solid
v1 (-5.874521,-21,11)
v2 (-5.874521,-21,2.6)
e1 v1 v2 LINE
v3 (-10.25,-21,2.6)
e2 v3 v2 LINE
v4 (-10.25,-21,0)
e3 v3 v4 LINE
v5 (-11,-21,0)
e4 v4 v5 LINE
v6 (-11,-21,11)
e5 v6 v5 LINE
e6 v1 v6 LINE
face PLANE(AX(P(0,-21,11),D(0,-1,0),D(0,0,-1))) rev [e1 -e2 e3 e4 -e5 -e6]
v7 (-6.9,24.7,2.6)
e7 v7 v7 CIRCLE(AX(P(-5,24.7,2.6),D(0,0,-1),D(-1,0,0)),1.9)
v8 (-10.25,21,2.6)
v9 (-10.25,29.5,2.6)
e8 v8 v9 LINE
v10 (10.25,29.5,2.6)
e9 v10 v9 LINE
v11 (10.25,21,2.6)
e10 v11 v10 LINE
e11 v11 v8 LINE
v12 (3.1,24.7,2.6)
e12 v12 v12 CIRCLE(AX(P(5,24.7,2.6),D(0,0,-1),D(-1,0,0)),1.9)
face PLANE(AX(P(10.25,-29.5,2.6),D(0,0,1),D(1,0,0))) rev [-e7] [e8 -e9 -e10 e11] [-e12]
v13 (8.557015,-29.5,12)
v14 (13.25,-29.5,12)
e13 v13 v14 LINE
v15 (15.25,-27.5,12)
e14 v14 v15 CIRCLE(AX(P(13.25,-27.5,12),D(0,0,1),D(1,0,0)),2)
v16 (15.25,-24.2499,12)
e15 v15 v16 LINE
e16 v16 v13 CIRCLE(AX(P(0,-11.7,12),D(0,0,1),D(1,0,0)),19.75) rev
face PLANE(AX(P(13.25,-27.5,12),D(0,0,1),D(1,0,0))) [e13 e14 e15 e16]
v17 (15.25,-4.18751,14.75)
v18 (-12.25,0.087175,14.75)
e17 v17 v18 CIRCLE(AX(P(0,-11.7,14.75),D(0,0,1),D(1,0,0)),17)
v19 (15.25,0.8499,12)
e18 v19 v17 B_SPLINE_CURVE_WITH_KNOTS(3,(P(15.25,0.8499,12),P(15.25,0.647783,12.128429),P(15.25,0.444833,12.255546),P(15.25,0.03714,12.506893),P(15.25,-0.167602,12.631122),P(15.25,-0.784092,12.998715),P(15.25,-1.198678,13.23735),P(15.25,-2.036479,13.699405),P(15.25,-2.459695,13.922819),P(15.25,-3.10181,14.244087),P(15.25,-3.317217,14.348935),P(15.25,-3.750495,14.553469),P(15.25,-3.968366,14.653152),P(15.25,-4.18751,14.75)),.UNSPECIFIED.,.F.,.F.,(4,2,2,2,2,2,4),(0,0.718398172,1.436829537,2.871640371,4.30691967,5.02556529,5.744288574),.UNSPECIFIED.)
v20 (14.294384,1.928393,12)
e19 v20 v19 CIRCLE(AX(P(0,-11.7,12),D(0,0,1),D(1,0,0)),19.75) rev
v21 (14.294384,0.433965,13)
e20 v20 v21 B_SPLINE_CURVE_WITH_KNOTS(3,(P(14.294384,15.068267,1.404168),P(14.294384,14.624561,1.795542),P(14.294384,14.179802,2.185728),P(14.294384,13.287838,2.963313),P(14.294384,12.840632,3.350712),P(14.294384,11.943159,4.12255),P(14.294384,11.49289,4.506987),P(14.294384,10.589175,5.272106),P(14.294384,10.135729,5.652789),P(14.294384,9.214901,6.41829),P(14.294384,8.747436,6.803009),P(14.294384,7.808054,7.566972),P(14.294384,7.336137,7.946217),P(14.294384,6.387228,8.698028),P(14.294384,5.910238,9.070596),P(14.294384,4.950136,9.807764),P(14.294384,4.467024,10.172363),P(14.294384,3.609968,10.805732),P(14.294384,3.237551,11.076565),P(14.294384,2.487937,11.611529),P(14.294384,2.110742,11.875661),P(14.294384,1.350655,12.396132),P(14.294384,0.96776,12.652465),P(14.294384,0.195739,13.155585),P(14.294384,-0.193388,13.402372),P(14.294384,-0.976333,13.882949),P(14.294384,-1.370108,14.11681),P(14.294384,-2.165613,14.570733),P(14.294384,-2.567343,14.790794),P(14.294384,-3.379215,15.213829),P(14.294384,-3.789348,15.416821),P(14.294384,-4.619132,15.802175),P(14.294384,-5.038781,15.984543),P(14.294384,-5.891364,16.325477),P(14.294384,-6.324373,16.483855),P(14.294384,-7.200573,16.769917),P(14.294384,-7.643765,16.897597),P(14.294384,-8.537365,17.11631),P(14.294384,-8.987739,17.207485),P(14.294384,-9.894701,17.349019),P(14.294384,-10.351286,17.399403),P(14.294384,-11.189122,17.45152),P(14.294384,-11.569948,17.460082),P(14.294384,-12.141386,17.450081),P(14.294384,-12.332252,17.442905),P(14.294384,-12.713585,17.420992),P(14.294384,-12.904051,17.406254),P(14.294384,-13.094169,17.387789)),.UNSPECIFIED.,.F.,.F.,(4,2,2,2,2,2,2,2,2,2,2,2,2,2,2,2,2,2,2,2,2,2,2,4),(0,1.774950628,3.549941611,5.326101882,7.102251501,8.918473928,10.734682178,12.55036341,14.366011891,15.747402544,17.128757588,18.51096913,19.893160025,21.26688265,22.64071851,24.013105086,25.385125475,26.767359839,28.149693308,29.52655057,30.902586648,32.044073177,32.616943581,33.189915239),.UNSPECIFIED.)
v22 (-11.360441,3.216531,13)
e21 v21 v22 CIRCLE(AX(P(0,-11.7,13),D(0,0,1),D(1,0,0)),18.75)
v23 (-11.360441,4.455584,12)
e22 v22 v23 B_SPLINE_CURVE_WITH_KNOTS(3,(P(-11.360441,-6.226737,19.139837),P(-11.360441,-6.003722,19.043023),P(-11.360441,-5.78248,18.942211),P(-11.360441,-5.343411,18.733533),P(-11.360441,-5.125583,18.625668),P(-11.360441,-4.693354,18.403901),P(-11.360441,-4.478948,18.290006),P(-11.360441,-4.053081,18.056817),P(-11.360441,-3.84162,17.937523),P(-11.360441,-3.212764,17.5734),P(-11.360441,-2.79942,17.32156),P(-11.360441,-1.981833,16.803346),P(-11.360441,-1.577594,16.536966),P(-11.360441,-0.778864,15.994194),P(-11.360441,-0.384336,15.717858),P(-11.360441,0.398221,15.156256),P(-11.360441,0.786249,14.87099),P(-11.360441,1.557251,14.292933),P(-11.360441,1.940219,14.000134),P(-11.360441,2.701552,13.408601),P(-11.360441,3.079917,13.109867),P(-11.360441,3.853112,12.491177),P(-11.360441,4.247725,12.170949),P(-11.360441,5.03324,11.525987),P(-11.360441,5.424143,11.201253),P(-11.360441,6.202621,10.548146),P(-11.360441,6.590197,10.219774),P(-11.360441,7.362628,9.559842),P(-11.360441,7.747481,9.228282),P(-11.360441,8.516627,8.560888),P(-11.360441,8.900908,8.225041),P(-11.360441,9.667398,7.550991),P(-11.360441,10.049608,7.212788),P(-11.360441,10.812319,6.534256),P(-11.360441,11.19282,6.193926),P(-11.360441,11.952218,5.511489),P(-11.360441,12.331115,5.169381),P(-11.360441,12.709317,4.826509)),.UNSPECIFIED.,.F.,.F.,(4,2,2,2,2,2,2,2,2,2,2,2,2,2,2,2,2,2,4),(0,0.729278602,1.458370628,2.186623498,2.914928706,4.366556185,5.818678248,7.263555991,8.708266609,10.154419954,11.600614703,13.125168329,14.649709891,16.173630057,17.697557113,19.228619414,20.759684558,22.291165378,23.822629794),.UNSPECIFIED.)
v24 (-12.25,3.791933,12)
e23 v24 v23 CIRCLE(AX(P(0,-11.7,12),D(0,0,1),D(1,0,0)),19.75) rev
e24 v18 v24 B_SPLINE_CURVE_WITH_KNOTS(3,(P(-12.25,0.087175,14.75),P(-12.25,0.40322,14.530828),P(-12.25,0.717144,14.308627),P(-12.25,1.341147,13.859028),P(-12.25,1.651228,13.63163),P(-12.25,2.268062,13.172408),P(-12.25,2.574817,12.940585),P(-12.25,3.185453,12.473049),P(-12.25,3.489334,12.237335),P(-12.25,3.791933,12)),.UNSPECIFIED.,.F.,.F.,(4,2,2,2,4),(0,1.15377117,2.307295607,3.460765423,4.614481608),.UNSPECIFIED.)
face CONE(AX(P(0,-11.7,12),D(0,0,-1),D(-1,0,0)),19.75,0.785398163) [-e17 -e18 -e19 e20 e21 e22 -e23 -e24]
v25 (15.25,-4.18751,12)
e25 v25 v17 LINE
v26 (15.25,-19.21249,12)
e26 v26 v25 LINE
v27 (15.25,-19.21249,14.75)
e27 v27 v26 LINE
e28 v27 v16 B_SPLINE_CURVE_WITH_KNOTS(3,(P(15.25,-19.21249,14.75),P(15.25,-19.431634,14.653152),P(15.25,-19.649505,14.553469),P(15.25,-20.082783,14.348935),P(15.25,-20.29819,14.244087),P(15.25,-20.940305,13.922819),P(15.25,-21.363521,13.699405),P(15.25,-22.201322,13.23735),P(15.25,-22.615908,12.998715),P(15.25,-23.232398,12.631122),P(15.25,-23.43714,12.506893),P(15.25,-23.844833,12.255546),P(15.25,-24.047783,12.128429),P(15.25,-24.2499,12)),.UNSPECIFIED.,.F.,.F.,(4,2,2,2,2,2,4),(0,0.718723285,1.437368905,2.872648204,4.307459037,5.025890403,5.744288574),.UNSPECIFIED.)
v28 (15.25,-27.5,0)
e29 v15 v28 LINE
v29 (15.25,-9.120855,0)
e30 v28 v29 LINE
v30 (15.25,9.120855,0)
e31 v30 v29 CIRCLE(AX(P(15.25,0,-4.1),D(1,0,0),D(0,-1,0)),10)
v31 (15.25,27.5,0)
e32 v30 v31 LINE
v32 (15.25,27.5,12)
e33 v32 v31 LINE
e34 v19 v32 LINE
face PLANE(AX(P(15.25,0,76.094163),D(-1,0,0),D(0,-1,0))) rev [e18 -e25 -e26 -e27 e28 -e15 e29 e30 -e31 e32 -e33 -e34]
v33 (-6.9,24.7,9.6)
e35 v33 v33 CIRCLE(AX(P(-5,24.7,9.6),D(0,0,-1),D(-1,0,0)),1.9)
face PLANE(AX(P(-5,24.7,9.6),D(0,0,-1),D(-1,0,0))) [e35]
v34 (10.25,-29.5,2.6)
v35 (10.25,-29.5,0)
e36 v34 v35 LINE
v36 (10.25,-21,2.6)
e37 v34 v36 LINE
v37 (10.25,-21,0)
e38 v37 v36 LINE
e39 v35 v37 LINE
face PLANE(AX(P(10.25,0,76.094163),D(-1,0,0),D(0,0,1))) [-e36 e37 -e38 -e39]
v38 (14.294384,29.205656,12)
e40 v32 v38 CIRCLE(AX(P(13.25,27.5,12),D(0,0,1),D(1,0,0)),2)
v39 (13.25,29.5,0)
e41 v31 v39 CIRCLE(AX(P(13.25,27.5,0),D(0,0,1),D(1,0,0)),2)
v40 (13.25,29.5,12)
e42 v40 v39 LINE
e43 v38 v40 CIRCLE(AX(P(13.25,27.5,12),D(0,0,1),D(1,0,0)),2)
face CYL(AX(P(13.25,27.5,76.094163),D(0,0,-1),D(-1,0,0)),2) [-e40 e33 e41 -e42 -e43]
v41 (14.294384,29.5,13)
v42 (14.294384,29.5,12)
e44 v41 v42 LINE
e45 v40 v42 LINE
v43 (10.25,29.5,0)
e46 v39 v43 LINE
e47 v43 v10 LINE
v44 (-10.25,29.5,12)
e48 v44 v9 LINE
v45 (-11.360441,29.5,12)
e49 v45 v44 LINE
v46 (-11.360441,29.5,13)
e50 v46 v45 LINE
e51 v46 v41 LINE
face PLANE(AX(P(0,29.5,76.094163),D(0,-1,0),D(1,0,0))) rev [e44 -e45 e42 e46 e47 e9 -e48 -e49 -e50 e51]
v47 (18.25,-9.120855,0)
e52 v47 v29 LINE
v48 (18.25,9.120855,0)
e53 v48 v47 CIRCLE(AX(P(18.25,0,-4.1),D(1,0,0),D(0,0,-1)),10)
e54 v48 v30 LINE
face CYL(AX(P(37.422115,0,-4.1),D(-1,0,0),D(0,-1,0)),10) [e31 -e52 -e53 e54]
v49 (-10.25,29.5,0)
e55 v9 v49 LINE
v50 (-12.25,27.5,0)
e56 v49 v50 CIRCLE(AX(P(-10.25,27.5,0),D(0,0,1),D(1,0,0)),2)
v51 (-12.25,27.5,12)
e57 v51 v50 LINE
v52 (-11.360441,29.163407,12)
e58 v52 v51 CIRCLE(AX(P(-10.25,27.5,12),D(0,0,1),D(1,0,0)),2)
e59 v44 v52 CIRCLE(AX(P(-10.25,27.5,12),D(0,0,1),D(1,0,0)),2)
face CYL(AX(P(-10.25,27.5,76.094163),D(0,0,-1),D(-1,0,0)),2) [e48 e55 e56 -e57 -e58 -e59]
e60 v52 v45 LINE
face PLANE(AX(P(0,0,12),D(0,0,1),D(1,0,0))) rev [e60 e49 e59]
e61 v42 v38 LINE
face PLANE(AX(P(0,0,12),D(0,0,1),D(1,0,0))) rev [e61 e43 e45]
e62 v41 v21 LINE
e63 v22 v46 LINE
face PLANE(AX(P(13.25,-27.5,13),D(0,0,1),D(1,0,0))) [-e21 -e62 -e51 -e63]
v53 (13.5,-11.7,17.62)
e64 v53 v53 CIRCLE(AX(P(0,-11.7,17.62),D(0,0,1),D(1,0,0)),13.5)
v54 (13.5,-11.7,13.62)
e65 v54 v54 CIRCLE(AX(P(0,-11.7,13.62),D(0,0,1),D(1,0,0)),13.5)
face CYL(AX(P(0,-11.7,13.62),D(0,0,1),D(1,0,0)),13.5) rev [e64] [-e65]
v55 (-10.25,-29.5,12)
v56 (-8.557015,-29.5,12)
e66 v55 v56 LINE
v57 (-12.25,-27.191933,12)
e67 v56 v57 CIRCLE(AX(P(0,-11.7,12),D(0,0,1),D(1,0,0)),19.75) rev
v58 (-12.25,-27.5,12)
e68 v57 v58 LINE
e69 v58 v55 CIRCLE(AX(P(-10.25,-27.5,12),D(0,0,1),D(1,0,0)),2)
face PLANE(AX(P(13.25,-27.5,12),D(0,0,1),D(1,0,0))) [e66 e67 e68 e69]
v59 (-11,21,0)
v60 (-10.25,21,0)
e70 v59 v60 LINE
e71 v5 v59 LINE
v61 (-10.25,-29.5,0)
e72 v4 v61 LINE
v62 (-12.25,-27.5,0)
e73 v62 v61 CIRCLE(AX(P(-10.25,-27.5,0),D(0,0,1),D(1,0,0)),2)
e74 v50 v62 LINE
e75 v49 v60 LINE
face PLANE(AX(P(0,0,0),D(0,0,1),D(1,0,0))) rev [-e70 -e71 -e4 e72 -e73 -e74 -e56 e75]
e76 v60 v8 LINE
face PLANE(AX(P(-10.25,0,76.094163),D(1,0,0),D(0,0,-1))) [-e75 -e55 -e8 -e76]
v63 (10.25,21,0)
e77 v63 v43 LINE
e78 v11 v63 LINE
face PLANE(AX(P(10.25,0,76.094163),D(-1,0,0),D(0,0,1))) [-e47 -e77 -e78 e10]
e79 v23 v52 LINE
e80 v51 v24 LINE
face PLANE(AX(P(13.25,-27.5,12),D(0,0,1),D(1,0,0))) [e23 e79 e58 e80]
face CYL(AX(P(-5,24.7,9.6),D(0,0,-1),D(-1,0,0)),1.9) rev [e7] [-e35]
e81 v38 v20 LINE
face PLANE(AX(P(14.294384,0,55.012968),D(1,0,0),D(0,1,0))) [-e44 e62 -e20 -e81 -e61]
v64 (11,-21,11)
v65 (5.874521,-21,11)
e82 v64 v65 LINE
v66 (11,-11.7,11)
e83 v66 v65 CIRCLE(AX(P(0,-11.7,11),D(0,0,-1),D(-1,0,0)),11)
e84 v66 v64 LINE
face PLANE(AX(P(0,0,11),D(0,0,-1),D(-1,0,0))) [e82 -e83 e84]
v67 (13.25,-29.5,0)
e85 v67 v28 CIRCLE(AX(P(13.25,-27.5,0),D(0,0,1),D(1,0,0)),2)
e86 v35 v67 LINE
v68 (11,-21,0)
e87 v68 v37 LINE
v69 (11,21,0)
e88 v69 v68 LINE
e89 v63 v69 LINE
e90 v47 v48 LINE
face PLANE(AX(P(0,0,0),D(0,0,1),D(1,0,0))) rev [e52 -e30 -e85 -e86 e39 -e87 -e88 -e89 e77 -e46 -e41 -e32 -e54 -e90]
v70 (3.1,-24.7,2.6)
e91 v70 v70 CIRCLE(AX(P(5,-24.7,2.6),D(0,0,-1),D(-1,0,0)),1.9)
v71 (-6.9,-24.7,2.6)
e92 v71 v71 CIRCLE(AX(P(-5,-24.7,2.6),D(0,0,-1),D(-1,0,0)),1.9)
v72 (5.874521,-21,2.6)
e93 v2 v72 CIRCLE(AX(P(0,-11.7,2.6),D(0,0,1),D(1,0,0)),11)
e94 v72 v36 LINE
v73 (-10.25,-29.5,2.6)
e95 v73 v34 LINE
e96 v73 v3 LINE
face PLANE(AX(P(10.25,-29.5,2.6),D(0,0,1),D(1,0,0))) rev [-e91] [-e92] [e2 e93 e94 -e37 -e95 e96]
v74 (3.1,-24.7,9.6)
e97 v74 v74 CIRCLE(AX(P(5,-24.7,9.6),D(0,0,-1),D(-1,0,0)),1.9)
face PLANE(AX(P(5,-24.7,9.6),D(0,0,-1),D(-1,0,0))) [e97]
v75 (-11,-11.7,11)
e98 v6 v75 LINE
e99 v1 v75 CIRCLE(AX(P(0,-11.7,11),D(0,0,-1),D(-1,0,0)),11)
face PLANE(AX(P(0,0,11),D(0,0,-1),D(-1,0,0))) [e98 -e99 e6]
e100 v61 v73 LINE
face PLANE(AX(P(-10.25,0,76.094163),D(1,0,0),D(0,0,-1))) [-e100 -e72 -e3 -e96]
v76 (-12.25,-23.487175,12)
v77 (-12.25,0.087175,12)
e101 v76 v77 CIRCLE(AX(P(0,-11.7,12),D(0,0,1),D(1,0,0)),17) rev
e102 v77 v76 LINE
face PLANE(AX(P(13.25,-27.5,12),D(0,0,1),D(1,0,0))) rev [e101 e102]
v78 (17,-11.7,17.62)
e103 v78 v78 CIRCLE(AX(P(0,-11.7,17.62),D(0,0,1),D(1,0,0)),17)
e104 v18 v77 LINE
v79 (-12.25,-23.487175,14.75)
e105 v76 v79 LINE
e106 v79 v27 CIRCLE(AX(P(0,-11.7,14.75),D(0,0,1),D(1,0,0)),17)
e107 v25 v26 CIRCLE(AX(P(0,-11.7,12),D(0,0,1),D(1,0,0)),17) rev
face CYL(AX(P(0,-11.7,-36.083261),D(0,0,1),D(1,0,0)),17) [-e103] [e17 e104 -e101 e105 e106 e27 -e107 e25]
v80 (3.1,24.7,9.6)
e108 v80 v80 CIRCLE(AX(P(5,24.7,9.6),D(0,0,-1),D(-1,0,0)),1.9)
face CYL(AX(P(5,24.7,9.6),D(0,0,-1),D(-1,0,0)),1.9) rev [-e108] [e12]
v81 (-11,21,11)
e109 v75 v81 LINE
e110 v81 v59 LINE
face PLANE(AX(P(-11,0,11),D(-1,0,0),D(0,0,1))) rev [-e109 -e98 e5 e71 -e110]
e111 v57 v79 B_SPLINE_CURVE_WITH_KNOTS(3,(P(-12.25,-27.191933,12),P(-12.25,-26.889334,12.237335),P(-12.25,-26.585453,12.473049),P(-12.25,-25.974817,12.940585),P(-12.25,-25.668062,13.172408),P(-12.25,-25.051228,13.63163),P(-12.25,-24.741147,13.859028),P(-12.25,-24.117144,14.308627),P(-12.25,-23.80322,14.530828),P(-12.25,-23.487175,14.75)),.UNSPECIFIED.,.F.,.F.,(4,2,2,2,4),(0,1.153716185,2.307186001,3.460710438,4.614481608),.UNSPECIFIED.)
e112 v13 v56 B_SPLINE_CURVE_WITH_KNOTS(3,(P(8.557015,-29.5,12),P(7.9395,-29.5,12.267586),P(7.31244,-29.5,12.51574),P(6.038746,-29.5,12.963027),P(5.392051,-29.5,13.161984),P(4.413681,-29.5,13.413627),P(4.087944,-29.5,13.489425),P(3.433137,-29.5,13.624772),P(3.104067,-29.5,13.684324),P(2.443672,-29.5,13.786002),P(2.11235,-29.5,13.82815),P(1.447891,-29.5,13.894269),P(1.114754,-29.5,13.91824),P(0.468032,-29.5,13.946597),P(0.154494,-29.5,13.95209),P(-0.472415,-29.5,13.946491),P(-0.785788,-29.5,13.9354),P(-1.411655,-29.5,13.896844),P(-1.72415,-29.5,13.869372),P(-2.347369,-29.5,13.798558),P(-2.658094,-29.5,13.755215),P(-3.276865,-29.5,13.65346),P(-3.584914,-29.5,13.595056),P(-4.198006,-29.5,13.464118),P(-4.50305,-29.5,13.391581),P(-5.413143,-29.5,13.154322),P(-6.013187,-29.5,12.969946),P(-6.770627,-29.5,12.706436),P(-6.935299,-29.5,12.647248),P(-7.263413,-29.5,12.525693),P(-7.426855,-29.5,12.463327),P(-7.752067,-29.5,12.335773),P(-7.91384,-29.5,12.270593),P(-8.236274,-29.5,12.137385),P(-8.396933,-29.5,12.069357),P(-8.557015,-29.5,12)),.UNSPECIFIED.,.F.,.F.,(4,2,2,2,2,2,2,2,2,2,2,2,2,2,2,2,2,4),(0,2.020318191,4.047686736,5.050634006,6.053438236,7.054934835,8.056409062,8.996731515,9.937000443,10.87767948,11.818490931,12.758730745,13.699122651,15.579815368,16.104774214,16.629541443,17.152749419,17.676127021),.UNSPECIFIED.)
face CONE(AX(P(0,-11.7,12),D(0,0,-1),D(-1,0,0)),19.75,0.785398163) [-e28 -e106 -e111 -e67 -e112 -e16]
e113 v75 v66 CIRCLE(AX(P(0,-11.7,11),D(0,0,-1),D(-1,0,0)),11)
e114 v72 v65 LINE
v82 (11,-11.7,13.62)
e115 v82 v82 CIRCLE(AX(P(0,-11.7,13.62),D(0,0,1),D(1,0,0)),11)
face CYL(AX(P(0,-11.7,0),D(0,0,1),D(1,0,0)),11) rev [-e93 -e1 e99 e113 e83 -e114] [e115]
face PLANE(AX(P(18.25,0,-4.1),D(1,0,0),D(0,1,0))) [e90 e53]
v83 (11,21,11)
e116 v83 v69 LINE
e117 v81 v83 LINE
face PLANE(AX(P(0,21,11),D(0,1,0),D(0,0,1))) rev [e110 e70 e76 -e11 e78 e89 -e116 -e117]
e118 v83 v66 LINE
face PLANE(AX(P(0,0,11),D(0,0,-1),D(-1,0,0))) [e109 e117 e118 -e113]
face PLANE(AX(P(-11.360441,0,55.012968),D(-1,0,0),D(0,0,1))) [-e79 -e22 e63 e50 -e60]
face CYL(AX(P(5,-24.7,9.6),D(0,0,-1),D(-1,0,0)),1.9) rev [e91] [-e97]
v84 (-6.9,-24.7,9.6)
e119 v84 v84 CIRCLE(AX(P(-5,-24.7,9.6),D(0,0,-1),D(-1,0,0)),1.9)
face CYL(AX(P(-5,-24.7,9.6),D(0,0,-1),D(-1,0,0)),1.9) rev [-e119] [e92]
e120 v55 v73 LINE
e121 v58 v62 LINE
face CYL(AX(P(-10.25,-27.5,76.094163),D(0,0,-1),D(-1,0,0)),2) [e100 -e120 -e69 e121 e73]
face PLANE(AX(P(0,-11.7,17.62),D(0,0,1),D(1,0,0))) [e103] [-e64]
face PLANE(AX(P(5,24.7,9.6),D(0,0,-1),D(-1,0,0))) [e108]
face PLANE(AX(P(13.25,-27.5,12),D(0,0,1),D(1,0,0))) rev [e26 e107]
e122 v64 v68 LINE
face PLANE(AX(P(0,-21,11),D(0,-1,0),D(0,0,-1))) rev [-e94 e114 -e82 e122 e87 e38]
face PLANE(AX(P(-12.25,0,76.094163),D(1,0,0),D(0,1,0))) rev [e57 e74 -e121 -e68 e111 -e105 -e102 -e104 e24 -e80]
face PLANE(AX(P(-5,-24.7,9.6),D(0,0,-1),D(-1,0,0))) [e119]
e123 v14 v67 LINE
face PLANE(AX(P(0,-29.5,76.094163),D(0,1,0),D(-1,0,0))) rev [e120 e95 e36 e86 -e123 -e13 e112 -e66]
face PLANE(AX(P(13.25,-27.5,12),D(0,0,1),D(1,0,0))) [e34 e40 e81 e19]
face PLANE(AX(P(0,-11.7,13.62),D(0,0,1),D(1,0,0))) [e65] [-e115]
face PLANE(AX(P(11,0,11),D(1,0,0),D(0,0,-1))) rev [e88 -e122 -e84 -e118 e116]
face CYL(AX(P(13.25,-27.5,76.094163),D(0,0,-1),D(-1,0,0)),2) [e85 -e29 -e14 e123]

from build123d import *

# Parameters (mm, degrees)
BOSS_EXTRUDE1_DEPTH      = 11
CUT_EXTRUDE1_DEPTH       = 62.923844357
CUT_EXTRUDE1_DEPTH_BACK  = 62.923844357
SKETCH2_W                = 20.5
SKETCH2_H                = 2.6
BOSS_EXTRUDE3_START      = -8.4
BOSS_EXTRUDE3_DEPTH      = 9.4
SKETCH4_R                = 17
SKETCH4_R_2              = 10
BOSS_EXTRUDE2_DEPTH      = 5.62
SKETCH5_R                = 13.5
CUT_EXTRUDE2_DEPTH       = 4
CUT_EXTRUDE3_DEPTH       = 37.67089309
CUT_EXTRUDE3_DEPTH_BACK  = 37.67089309
SKETCH6_R                = 10.5
BOSS_EXTRUDE4_START      = 1.12
SKETCH18_R               = 17
BOSS_EXTRUDE4_DEPTH      = 1.12
CHAMFER3_SIZE            = 2.75
BOSS_EXTRUDE7_START      = 1
BOSS_EXTRUDE7_DEPTH      = 1
CUT_EXTRUDE17_START      = 12
SKETCH28_W               = 22
SKETCH28_H               = 42
CUT_EXTRUDE17_DEPTH      = 11
CUT_EXTRUDE18_DEPTH      = 37.488140539
CUT_EXTRUDE18_DEPTH_BACK = 37.488140539
SKETCH29_R               = 11
SKETCH31_R               = 1.9
CUT_EXTRUDE19_DEPTH      = 7
BOSS_EXTRUDE8_DEPTH      = 3


with BuildPart() as part:
    # Sketch1 → Boss-Extrude1 (new body)
    with BuildSketch(Plane.XY):
        with BuildLine():
            ThreePointArc((15.25, 27.5), (14.664213562, 28.914213562), (13.25, 29.5))
            Line((13.25, 29.5), (-10.25, 29.5))
            ThreePointArc((-10.25, 29.5), (-11.664213562, 28.914213562), (-12.25, 27.5))
            Line((-12.25, 27.5), (-12.25, 0.346410162))
            Line((-12.25, 0.346410162), (-12.25, 0))
            Line((-12.25, 0), (-12.25, -0.346410162))
            Line((-12.25, -0.346410162), (-12.25, -27.5))
            ThreePointArc((-12.25, -27.5), (-11.664213562, -28.914213562), (-10.25, -29.5))
            Line((-10.25, -29.5), (13.25, -29.5))
            ThreePointArc((13.25, -29.5), (14.664213562, -28.914213562), (15.25, -27.5))
            Line((15.25, -27.5), (15.25, -9.120855223))
            Line((15.25, -9.120855223), (15.25, 9.120855223))
            Line((15.25, 9.120855223), (15.25, 27.5))
        make_face()
        with BuildLine():
            Line((7, 22.5), (10.25, 22.5))
            Line((10.25, 22.5), (10.25, -22.5))
            Line((10.25, -22.5), (7, -22.5))
            Line((7, -22.5), (7, -24.7))
            ThreePointArc((7, -24.7), (5, -26.7), (3, -24.7))
            Line((3, -24.7), (3, -22.5))
            Line((3, -22.5), (-3, -22.5))
            Line((-3, -22.5), (-3, -24.7))
            ThreePointArc((-3, -24.7), (-5, -26.7), (-7, -24.7))
            Line((-7, -24.7), (-7, -22.5))
            Line((-7, -22.5), (-10.25, -22.5))
            Line((-10.25, -22.5), (-10.25, 22.5))
            Line((-10.25, 22.5), (-7, 22.5))
            Line((-7, 22.5), (-7, 24.7))
            ThreePointArc((-7, 24.7), (-5, 26.7), (-3, 24.7))
            Line((-3, 24.7), (-3, 22.5))
            Line((-3, 22.5), (3, 22.5))
            Line((3, 22.5), (3, 24.7))
            ThreePointArc((3, 24.7), (5, 26.7), (7, 24.7))
            Line((7, 24.7), (7, 22.5))
        make_face(mode=Mode.SUBTRACT)
    extrude(amount=BOSS_EXTRUDE1_DEPTH)

    # Sketch2 → Cut-Extrude1 (cut, two sides: drawn at the far end of the back side and taken through both)
    with BuildSketch(Plane(origin=(0, 29.5, 0), x_dir=(1, 0, 0), z_dir=(0, 1, 0)).offset(-CUT_EXTRUDE1_DEPTH_BACK)):
        with Locations((0, -1.3)):
            Rectangle(SKETCH2_W, SKETCH2_H)
    extrude(amount=CUT_EXTRUDE1_DEPTH + CUT_EXTRUDE1_DEPTH_BACK, mode=Mode.SUBTRACT)

    # Sketch3 → Boss-Extrude3 (add)
    with BuildSketch(Plane.XY.offset(11).offset(BOSS_EXTRUDE3_START)):
        with BuildLine():
            Line((-10.25, -29.5), (13.25, -29.5))
            ThreePointArc((13.25, -29.5), (14.664213562, -28.914213562), (15.25, -27.5))
            Line((15.25, -27.5), (15.25, 27.5))
            ThreePointArc((15.25, 27.5), (14.664213562, 28.914213562), (13.25, 29.5))
            Line((13.25, 29.5), (-10.25, 29.5))
            ThreePointArc((-10.25, 29.5), (-11.664213562, 28.914213562), (-12.25, 27.5))
            Line((-12.25, 27.5), (-12.25, -27.5))
            ThreePointArc((-12.25, -27.5), (-11.664213562, -28.914213562), (-10.25, -29.5))
        make_face()
    extrude(amount=BOSS_EXTRUDE3_DEPTH)

    # Sketch4 → Boss-Extrude2 (add)
    with BuildSketch(Plane.XY.offset(17.62)):
        with Locations((0, -11.7)):
            Circle(SKETCH4_R)
        with Locations((0, -11.7)):
            Circle(SKETCH4_R_2, mode=Mode.SUBTRACT)
    extrude(amount=-BOSS_EXTRUDE2_DEPTH)

    # Sketch5 → Cut-Extrude2 (cut)
    with BuildSketch(Plane.XY.offset(17.62)):
        with Locations((0, -11.7)):
            Circle(SKETCH5_R)
    extrude(amount=-CUT_EXTRUDE2_DEPTH, mode=Mode.SUBTRACT)

    # Sketch6 → Cut-Extrude3 (cut, two sides: drawn at the far end of the back side and taken through both)
    with BuildSketch(Plane.XY.offset(13.62).offset(-CUT_EXTRUDE3_DEPTH_BACK)):
        with Locations((0, -11.7)):
            Circle(SKETCH6_R)
    extrude(amount=CUT_EXTRUDE3_DEPTH + CUT_EXTRUDE3_DEPTH_BACK, mode=Mode.SUBTRACT)

    # Sketch18 → Boss-Extrude4 (add)
    with BuildSketch(Plane.XY.offset(12).offset(BOSS_EXTRUDE4_START)):
        with Locations((0, -11.7)):
            Circle(SKETCH18_R)
    extrude(amount=-BOSS_EXTRUDE4_DEPTH)

    # Chamfer3
    # the kernel refuses this chamfer: 2.75 mm, written as the material it adds along each edge
    with BuildSketch(Plane(origin=(0, -11.7, 12), x_dir=(0.99914018616096, 0.041459478991448445, 0), z_dir=(0.041459478991448445, -0.99914018616096, 0))) as chamfer3_piece_1_section:
        Polygon((17, CHAMFER3_SIZE), (17 + CHAMFER3_SIZE, 0), (17, 0), align=None)
    chamfer3_piece_1 = revolve(axis=Axis((0, -11.7, 12), (0, 0, 1)), revolution_arc=157.576683104, mode=Mode.PRIVATE)
    chamfer3_piece_1 = split(chamfer3_piece_1, bisect_by=Plane(origin=(15.25, 6.422467161, 13.340102963), z_dir=(-1, 0, 0)), keep=Keep.TOP, mode=Mode.PRIVATE)
    chamfer3_piece_1 = split(chamfer3_piece_1, bisect_by=Plane(origin=(-12.25, 6.422467161, 13.340102963), z_dir=(1, 0, 0)), keep=Keep.TOP, mode=Mode.PRIVATE)
    add(chamfer3_piece_1)
    with BuildSketch(Plane(origin=(0, -11.7, 12), x_dir=(-0.9394106509692863, -0.3427938576542199, 0), z_dir=(-0.3427938576542199, 0.9394106509692863, 0))) as chamfer3_piece_2_section:
        Polygon((17, CHAMFER3_SIZE), (17 + CHAMFER3_SIZE, 0), (17, 0), align=None)
    chamfer3_piece_2 = revolve(axis=Axis((0, -11.7, 12), (0, 0, 1)), revolution_arc=157.576683104, mode=Mode.PRIVATE)
    chamfer3_piece_2 = split(chamfer3_piece_2, bisect_by=Plane(origin=(15.25, -27.115392877, 14.25853692), z_dir=(-1, 0, 0)), keep=Keep.TOP, mode=Mode.PRIVATE)
    chamfer3_piece_2 = split(chamfer3_piece_2, bisect_by=Plane(origin=(-12.25, -27.115392877, 14.25853692), z_dir=(1, 0, 0)), keep=Keep.TOP, mode=Mode.PRIVATE)
    chamfer3_piece_2 = split(chamfer3_piece_2, bisect_by=Plane(origin=(-8.124246578, -29.5, 14.25853692), z_dir=(0, 1, 0)), keep=Keep.TOP, mode=Mode.PRIVATE)
    add(chamfer3_piece_2)

    # Sketch19 → Boss-Extrude7 (add)
    with BuildSketch(Plane.XY.offset(12).offset(BOSS_EXTRUDE7_START)):
        with BuildLine():
            Line((-11.360440511, 29.5), (-11.360440511, 0.946754184))
            ThreePointArc((-11.360440511, 0.946754184), (2.262558078, 5.148763484), (14.294383554, -2.498337172))
            Line((14.294383554, -2.498337172), (14.294383554, 29.5))
            Line((14.294383554, 29.5), (-11.360440511, 29.5))
        make_face()
    extrude(amount=-BOSS_EXTRUDE7_DEPTH)

    # Sketch28 → Cut-Extrude17 (cut)
    with BuildSketch(Plane(origin=(0, 0, 12), x_dir=(-1, 0, 0), z_dir=(0, 0, -1)).offset(CUT_EXTRUDE17_START)):
        Rectangle(SKETCH28_W, SKETCH28_H)
    extrude(amount=-CUT_EXTRUDE17_DEPTH, mode=Mode.SUBTRACT)

    # Sketch29 → Cut-Extrude18 (cut, two sides: drawn at the far end of the back side and taken through both)
    with BuildSketch(Plane.XY.offset(13.12).offset(-CUT_EXTRUDE18_DEPTH_BACK)):
        with Locations((0, -11.7)):
            Circle(SKETCH29_R)
    extrude(amount=CUT_EXTRUDE18_DEPTH + CUT_EXTRUDE18_DEPTH_BACK, mode=Mode.SUBTRACT)

    # Sketch31 → Cut-Extrude19 (cut)
    with BuildSketch(Plane(origin=(0, 0, 2.6), x_dir=(-1, 0, 0), z_dir=(0, 0, -1))):
        with Locations((5, 24.7)):
            Circle(SKETCH31_R)
        with Locations((-5, 24.7)):
            Circle(SKETCH31_R)
        with Locations((-5, -24.7)):
            Circle(SKETCH31_R)
        with Locations((5, -24.7)):
            Circle(SKETCH31_R)
    extrude(amount=-CUT_EXTRUDE19_DEPTH, mode=Mode.SUBTRACT)

    # Sketch35 → Boss-Extrude8 (add)
    with BuildSketch(Plane(origin=(15.25, 0, 0), x_dir=(0, 0, -1), z_dir=(1, 0, 0))):
        with BuildLine():
            Line((0, -9.120855223), (0, 9.120855223))
            ThreePointArc((0, 9.120855223), (-5.9, 0), (0, -9.120855223))
        make_face()
    extrude(amount=BOSS_EXTRUDE8_DEPTH)


solid = part.part
